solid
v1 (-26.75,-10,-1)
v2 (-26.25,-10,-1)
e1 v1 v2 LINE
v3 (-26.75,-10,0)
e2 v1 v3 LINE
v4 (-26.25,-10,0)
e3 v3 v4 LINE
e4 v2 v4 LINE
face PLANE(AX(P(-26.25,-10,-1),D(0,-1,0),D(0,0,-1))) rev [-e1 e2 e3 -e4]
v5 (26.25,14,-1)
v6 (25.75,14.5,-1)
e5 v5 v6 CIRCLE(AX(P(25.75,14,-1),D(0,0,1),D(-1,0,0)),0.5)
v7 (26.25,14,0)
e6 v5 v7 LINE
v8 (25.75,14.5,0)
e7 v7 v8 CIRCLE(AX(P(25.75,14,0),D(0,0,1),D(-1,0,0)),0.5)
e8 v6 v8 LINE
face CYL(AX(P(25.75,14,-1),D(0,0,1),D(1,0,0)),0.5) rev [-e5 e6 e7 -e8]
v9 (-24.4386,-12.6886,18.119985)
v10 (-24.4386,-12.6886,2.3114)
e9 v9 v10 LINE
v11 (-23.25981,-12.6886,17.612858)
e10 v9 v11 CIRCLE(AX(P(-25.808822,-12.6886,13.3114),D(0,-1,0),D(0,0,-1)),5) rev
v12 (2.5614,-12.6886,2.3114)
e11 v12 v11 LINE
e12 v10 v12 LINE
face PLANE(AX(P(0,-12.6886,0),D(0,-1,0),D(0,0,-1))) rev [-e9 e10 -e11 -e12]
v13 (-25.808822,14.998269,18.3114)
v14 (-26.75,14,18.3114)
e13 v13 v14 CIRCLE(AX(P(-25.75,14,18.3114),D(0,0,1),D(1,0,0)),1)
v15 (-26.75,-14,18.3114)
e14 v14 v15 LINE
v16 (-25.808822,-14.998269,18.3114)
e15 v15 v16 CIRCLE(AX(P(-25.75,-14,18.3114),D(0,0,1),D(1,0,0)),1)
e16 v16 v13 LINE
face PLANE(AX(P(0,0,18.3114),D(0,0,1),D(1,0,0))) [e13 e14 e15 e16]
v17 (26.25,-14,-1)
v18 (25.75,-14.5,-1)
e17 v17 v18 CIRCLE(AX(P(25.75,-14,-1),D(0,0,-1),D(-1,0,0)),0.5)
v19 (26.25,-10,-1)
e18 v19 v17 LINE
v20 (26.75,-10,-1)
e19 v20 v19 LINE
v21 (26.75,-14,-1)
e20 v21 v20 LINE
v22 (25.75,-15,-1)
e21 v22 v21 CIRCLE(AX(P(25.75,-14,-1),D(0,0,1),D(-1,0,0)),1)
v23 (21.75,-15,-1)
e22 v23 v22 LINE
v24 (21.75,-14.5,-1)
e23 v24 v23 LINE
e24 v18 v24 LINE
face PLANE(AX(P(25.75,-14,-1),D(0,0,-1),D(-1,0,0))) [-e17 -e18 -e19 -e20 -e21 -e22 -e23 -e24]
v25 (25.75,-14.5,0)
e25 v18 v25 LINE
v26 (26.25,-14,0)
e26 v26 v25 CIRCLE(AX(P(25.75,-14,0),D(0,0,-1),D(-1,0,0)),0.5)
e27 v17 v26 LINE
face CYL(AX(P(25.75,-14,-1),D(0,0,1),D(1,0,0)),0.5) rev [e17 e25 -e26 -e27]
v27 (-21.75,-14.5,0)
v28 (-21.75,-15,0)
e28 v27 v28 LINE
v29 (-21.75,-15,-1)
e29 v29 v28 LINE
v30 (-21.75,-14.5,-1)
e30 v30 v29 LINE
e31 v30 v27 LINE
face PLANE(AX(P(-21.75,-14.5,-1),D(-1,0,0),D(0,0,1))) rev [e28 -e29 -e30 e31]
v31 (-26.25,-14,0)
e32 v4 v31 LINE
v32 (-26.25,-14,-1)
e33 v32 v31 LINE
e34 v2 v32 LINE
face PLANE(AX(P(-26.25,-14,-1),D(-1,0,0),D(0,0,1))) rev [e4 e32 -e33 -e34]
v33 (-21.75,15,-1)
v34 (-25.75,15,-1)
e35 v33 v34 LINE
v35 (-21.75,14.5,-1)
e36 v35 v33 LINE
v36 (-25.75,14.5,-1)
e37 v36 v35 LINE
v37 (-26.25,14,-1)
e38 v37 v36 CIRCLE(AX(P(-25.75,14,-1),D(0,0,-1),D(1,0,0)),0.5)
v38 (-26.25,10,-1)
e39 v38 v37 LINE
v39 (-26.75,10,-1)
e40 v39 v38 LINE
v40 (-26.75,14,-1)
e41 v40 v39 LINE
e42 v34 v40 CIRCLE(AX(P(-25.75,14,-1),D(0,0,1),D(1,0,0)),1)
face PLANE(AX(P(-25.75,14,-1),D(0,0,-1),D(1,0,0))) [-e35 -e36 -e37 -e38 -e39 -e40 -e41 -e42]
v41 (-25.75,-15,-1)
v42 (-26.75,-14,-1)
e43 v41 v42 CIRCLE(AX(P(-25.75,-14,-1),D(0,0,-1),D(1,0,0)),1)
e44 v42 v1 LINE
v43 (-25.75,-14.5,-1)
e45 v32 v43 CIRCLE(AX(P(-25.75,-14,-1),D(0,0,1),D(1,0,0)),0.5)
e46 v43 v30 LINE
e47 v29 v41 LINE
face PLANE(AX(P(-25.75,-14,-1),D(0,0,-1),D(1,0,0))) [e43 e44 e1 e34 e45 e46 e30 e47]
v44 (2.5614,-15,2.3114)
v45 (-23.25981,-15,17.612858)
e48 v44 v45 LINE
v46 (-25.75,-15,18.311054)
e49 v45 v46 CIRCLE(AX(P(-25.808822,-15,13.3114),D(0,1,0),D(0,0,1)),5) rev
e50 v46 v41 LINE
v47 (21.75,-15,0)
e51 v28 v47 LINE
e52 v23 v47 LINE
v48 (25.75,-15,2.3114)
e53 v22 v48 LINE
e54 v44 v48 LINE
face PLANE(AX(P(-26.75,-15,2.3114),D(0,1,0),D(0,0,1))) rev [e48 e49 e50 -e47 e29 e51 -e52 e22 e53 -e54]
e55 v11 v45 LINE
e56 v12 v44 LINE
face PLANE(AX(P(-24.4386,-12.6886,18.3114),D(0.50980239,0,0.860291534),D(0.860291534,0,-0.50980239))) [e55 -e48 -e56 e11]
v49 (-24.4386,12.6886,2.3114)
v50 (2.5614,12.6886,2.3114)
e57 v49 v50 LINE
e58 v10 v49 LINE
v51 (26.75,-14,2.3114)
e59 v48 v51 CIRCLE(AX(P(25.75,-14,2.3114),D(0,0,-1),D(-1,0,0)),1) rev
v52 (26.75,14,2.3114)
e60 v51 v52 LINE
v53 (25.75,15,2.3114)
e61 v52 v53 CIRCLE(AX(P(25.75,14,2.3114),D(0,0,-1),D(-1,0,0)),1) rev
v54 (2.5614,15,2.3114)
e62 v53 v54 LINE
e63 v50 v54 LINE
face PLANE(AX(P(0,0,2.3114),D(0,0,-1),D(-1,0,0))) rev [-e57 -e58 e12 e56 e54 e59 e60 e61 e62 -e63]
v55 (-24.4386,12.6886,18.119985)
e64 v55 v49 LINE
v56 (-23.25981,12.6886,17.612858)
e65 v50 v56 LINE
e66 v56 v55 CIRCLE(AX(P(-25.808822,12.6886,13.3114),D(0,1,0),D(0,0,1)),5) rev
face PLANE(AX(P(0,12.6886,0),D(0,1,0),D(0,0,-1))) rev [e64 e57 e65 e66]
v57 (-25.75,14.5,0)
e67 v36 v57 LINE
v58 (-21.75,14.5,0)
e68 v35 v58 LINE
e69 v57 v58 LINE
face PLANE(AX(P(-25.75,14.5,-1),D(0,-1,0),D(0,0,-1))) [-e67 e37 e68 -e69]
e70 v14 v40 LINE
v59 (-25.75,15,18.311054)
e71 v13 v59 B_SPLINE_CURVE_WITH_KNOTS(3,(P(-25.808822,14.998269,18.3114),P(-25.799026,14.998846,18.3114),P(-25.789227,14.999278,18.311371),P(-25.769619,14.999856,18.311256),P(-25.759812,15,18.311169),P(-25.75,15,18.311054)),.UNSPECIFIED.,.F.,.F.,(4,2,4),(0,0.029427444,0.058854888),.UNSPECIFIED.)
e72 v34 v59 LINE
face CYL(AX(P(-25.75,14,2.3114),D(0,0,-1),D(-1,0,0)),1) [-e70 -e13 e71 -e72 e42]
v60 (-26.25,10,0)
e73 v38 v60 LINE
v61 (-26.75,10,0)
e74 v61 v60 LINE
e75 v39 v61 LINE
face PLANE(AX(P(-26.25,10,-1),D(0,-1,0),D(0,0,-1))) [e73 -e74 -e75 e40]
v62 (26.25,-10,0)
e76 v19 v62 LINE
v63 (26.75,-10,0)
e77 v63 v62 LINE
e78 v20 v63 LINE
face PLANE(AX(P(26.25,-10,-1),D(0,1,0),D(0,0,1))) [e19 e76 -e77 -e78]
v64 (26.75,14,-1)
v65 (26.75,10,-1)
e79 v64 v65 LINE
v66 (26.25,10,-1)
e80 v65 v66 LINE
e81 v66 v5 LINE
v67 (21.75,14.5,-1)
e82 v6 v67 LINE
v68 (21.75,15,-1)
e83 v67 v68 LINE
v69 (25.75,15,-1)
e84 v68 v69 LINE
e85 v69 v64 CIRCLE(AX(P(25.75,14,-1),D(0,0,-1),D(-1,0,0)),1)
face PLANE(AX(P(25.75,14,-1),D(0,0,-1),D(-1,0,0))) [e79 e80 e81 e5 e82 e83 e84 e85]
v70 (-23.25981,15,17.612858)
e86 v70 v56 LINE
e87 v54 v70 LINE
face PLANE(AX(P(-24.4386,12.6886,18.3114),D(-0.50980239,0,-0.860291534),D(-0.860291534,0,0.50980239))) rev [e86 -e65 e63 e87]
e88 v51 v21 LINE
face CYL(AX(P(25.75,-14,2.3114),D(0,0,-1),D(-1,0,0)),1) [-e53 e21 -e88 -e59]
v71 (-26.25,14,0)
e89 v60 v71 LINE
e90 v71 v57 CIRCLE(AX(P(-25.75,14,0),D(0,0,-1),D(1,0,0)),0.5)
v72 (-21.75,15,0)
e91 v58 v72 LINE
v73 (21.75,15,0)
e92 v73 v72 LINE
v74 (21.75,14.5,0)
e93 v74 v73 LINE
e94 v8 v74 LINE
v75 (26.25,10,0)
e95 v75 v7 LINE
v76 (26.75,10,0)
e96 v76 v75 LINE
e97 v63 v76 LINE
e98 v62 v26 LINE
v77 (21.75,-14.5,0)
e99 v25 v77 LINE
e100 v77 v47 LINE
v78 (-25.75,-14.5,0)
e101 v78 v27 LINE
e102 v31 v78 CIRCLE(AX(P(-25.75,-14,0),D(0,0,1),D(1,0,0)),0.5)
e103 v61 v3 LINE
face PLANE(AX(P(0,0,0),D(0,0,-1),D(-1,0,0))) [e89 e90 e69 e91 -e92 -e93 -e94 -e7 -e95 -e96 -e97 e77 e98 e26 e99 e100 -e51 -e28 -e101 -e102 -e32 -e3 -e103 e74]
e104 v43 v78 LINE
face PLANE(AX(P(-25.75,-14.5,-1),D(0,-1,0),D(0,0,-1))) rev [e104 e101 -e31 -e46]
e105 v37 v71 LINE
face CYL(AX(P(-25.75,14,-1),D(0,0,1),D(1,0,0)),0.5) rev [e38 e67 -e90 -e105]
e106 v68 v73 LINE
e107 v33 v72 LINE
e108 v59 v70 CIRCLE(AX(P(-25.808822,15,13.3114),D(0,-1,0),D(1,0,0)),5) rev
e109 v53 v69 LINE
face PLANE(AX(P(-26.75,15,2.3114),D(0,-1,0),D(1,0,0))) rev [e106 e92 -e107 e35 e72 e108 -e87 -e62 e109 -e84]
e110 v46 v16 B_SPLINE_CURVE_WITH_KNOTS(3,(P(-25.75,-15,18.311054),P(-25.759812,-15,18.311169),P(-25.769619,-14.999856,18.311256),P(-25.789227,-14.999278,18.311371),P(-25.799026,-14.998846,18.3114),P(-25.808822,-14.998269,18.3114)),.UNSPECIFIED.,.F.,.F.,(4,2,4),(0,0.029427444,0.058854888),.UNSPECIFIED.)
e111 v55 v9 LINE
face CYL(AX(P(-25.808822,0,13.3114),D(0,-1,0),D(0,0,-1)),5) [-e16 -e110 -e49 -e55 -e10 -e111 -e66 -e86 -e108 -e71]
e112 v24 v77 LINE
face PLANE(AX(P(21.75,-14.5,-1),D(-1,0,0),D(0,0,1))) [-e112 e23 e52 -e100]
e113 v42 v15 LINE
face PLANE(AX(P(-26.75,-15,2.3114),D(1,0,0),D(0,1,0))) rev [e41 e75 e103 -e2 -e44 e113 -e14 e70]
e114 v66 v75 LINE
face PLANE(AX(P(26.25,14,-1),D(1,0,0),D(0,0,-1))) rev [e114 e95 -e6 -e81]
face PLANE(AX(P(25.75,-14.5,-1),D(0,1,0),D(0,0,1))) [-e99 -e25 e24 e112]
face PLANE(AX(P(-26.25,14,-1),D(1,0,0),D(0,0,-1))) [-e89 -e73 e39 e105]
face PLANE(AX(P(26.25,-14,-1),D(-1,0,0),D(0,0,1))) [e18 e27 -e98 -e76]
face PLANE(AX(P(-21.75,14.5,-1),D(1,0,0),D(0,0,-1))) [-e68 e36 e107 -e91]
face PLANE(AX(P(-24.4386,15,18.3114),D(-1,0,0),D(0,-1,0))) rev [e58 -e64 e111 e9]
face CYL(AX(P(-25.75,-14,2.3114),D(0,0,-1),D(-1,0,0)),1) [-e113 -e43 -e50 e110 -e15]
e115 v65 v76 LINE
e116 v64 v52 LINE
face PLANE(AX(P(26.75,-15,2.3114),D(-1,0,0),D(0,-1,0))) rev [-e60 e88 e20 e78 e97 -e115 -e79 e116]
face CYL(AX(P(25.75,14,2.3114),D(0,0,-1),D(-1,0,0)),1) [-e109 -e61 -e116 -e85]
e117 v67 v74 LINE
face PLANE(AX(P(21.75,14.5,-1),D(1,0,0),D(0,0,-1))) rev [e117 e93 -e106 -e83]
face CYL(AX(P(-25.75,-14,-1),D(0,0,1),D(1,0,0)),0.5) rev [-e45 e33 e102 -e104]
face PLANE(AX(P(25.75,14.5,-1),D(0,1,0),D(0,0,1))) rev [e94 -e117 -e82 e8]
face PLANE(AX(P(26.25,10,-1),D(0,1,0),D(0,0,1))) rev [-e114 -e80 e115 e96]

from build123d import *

# Parameters (mm, degrees)
SKETCH1_W            = 53.5
SKETCH1_H            = 30
BOSS_EXTRUDE1_DEPTH  = 2.3114
SKETCH2_W            = 2.3114
SKETCH2_H            = 30
BOSS_EXTRUDE2_DEPTH  = 16
BOSS_EXTRUDE3_DEPTH  = 2.3114
FILLET1_R            = 1
FILLET2_START        = -16
FILLET2_DEPTH        = 32
BOSS_EXTRUDE5_DEPTH  = 1
MIRROR3_COPY_1_DEPTH = 1


with BuildPart() as part:
    # Sketch1 → Boss-Extrude1 (new body)
    with BuildSketch(Plane.XY):
        Rectangle(SKETCH1_W, SKETCH1_H)
    extrude(amount=BOSS_EXTRUDE1_DEPTH)

    # Sketch2 → Boss-Extrude2 (add)
    with BuildSketch(Plane.XY.offset(2.3114)):
        with Locations((-25.5943, 0)):
            Rectangle(SKETCH2_W, SKETCH2_H)
    extrude(amount=BOSS_EXTRUDE2_DEPTH)

    # Sketch3 → Boss-Extrude3 (add)
    with BuildSketch(Plane.XZ.offset(15)):
        Polygon((-24.4386, 18.3114), (2.5614, 2.3114), (-24.4386, 2.3114), align=None)
    boss_extrude3 = extrude(amount=-BOSS_EXTRUDE3_DEPTH)

    # Mirror1: Boss-Extrude3 across plane
    add(boss_extrude3.mirror(Plane.ZX))

    # Fillet1
    fillet1_edges = [part.edges().sort_by_distance(p)[0] for p in [
        (26.75, 15, 1.1557),
        (26.75, -15, 1.1557),
        (-26.75, 15, 9.1557),
        (-26.75, -15, 9.1557),
    ]]
    fillet(fillet1_edges, radius=FILLET1_R)

    # Fillet2: read off the stored shape, not the designer's step
    # Fillet2 outline → Fillet2 (cut)
    with BuildSketch(Plane(origin=(0, 0, 0), x_dir=(1, 0, 0), z_dir=(0, 1, 0)).offset(FILLET2_START)):
        with BuildLine():
            Line((-24.4386, -18.3114), (-23.259809815, -17.612857668))
            ThreePointArc((-23.259809815, -17.612857668), (-24.487324196, -18.133603249), (-25.808821767, -18.3114))
            Line((-25.808821767, -18.3114), (-24.4386, -18.3114))
        make_face()
    extrude(amount=FILLET2_DEPTH, mode=Mode.SUBTRACT)

    # Sketch7 → Boss-Extrude5 (add)
    with BuildSketch(Plane(origin=(0, 0, 0), x_dir=(-1, 0, 0), z_dir=(0, 0, -1))):
        with BuildLine():
            Line((-25.75, 15), (-21.75, 15))
            Line((-21.75, 15), (-21.75, 14.5))
            Line((-21.75, 14.5), (-25.75, 14.5))
            ThreePointArc((-25.75, 14.5), (-26.103553391, 14.353553391), (-26.25, 14))
            Line((-26.25, 14), (-26.25, 10))
            Line((-26.25, 10), (-26.75, 10))
            Line((-26.75, 10), (-26.75, 14))
            ThreePointArc((-26.75, 14), (-26.457106781, 14.707106781), (-25.75, 15))
        make_face()
    boss_extrude5 = extrude(amount=BOSS_EXTRUDE5_DEPTH)

    # Mirror2: Boss-Extrude5 across plane
    add(boss_extrude5.mirror(Plane.ZX))

    # Mirror3: Boss-Extrude5 across plane
    add(boss_extrude5.mirror(Plane(origin=(0, 0, 0), x_dir=(0, 0, 1), z_dir=(1, 0, 0))))

    # Mirror3 copy 1 sketch → Mirror3 copy 1 (add)
    with BuildSketch(Plane(origin=(0, 0, 0), x_dir=(1, 0, 0), z_dir=(0, 0, -1))):
        with BuildLine():
            Line((-25.75, 15), (-21.75, 15))
            Line((-21.75, 15), (-21.75, 14.5))
            Line((-21.75, 14.5), (-25.75, 14.5))
            ThreePointArc((-25.75, 14.5), (-26.103553391, 14.353553391), (-26.25, 14))
            Line((-26.25, 14), (-26.25, 10))
            Line((-26.25, 10), (-26.75, 10))
            Line((-26.75, 10), (-26.75, 14))
            ThreePointArc((-26.75, 14), (-26.457106781, 14.707106781), (-25.75, 15))
        make_face()
    extrude(amount=MIRROR3_COPY_1_DEPTH)


solid = part.part
